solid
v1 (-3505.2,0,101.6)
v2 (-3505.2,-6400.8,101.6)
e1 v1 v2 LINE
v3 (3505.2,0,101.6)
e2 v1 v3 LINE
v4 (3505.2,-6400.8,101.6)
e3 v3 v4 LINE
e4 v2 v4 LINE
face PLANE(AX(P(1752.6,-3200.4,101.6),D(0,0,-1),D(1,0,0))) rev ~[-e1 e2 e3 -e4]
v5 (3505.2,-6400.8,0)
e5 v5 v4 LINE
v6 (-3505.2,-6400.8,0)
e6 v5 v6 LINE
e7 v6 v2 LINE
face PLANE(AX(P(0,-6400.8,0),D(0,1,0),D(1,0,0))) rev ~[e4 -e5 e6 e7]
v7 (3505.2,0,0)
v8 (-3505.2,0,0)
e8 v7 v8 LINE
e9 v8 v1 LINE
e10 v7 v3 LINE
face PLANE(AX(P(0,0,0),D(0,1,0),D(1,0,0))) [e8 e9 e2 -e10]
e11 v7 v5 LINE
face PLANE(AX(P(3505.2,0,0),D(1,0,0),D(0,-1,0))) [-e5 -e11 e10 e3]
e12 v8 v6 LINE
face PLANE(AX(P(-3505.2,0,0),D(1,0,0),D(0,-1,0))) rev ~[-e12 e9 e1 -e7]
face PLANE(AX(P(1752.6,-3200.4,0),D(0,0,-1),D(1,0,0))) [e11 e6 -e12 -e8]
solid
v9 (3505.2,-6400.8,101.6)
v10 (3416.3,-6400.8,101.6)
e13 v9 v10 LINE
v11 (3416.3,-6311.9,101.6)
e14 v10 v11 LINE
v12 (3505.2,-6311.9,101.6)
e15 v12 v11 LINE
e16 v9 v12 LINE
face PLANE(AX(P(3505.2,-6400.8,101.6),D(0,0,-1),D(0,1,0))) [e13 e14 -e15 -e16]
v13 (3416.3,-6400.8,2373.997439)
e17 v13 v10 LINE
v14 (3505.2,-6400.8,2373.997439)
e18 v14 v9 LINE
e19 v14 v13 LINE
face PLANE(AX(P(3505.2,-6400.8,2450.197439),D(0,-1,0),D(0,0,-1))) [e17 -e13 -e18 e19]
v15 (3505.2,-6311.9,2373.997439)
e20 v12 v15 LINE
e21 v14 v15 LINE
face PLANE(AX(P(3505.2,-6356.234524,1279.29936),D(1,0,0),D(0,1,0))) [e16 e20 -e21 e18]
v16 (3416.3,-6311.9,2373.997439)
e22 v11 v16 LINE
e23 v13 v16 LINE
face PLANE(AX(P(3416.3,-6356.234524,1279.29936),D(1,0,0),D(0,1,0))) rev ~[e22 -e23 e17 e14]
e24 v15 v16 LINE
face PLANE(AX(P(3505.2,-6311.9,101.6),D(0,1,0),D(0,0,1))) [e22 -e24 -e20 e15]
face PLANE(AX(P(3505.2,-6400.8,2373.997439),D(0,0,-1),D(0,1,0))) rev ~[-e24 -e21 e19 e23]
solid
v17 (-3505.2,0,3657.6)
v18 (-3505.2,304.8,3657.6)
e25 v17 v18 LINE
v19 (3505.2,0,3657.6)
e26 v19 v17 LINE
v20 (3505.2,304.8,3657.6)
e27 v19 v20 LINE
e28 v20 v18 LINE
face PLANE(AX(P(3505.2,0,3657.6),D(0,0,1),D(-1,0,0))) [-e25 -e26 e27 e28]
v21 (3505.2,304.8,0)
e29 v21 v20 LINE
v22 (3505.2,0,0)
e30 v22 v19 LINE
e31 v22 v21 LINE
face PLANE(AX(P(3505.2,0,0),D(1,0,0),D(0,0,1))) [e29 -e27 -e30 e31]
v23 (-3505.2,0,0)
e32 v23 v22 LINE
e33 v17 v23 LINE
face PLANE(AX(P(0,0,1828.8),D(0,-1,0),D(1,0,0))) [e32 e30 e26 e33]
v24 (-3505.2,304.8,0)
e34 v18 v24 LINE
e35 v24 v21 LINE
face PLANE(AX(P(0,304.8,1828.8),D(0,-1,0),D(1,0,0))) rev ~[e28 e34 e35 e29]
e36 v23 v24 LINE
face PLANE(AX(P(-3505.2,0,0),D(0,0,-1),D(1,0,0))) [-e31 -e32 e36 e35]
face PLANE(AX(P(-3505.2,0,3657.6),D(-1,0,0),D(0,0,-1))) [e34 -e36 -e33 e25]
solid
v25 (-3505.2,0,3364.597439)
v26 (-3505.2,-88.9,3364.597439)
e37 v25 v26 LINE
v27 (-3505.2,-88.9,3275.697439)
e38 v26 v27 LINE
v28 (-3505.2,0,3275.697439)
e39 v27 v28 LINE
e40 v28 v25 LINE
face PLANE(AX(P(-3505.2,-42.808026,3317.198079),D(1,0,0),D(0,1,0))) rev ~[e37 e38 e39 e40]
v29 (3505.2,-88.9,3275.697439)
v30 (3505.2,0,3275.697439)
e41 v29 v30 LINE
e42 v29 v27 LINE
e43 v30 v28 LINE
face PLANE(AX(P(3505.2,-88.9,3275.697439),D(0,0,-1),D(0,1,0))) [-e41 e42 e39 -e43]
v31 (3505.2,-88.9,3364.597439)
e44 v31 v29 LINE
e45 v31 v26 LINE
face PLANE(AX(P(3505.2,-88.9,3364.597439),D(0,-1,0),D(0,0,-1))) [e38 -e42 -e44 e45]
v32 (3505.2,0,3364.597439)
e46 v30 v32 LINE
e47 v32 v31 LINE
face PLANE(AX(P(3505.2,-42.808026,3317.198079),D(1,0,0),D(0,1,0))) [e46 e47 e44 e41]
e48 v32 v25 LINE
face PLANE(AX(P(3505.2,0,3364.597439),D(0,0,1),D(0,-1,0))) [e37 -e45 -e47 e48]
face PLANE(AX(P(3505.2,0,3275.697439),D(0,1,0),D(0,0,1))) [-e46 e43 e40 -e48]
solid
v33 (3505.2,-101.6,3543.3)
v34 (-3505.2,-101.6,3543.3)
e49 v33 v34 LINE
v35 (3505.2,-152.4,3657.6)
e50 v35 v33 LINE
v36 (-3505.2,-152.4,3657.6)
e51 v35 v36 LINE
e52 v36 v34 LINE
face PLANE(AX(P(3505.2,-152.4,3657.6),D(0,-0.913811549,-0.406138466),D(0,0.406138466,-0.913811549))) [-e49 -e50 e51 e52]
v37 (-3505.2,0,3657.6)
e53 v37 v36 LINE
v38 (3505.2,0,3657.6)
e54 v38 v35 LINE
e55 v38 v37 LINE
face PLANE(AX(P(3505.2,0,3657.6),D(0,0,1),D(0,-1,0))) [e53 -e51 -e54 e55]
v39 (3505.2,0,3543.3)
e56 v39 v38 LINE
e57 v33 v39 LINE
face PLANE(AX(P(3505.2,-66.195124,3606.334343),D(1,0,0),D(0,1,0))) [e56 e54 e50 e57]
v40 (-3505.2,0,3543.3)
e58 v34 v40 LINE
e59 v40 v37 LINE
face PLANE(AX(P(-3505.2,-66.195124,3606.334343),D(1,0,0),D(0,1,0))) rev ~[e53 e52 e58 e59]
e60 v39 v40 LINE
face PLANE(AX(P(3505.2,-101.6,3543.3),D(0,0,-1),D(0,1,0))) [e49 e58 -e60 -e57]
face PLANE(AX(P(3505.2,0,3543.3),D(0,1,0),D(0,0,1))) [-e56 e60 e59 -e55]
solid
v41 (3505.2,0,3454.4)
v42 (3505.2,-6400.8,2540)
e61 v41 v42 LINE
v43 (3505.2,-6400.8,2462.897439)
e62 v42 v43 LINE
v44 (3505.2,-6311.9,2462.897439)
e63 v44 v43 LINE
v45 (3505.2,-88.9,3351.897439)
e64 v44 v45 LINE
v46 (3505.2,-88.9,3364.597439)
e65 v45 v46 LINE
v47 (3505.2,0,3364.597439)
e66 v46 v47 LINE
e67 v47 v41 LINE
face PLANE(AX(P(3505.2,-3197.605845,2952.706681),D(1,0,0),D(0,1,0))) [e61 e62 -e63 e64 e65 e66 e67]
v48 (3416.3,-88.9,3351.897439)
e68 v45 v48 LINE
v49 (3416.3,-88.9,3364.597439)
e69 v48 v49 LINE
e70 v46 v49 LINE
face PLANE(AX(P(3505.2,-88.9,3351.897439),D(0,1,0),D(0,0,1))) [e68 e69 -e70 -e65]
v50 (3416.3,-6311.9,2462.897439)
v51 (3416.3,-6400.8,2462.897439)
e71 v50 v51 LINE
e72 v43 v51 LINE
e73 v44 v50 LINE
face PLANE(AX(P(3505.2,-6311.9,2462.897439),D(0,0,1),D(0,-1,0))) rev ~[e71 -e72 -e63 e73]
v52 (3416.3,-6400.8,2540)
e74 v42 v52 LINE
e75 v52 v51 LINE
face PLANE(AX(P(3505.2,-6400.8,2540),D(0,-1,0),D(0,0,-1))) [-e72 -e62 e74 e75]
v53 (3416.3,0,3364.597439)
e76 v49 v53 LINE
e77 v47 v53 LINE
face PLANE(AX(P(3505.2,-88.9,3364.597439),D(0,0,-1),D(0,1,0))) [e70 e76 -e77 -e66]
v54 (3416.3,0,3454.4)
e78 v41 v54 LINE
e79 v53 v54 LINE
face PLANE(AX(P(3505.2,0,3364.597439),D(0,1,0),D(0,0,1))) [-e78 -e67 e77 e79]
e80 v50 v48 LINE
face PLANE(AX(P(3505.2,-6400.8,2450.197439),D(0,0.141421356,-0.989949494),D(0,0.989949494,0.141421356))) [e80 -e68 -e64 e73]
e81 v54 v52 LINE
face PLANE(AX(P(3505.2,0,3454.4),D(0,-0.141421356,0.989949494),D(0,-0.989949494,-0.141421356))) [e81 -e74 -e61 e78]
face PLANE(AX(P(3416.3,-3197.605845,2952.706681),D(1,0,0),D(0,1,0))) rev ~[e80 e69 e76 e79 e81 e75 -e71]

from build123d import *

# Parameters (mm, degrees)
F2_DEPTH  = 304.8
F4_DEPTH  = 7010.4
F1_E1_W   = 3505.2
F1_E1_H   = 6400.8
F1_E0_W   = 3505.2
F1_E0_H   = 6400.8
F5_DEPTH  = 101.6
F7_DEPTH  = 88.9
F8_DEPTH  = 88.9
F9_DEPTH  = 7010.4
F11_DEPTH = 88.9


with BuildPart() as f2:
    # F0 (on Front) → F2 (new body)
    with BuildSketch(Plane.XZ):
        Polygon((-3505.2, 0), (0, 0), (3505.2, 0), (3505.2, 3657.6), (-3505.2, 3657.6), align=None)
    extrude(amount=-F2_DEPTH)


with BuildPart() as f4:
    # F3 (on face) → F4 (new body)
    with BuildSketch(Plane.YZ.offset(3505.2)):
        Polygon((0, 3543.3), (0, 3657.6), (-152.4, 3657.6), (-101.6, 3543.3), align=None)
    extrude(amount=-F4_DEPTH)


with BuildPart() as f5:
    # F1_E1 (on explicit) + F1_E0 (on explicit) → F5 (new body)
    with BuildSketch(Plane(origin=(0, 0, 0), x_dir=(-1, 0, 0), z_dir=(0, 0, 1))):
        with Locations((1752.6, 3200.4)):
            Rectangle(F1_E1_W, F1_E1_H)
    with BuildSketch(Plane(origin=(0, 0, 0), x_dir=(1, 0, 0), z_dir=(0, 0, -1))):
        with Locations((1752.6, 3200.4)):
            Rectangle(F1_E0_W, F1_E0_H)
    extrude(amount=F5_DEPTH, dir=(0, 0, 1))


with BuildPart() as f7:
    # F6 (on face) → F7 (new body)
    with BuildSketch(Plane.YZ.offset(3505.2)):
        Polygon((-6400.8, 101.6), (-6311.9, 101.6), (-6311.9, 2462.8974387893), (-6400.8, 2450.1974387893), align=None)
    extrude(amount=-F7_DEPTH)


with BuildPart() as f8:
    # F6 (on face) → F8 (new body)
    with BuildSketch(Plane.YZ.offset(3505.2)):
        Polygon((-88.9, 3364.5974387893), (0, 3364.5974387893), (0, 3454.4), (-6400.8, 2540), (-6400.8, 2450.1974387893), (-6311.9, 2462.8974387893), (-88.9, 3351.8974387893), align=None)
    extrude(amount=-F8_DEPTH)


with BuildPart() as f9:
    # F6 (on face) → F9 (new body)
    with BuildSketch(Plane.YZ.offset(3505.2)):
        Polygon((-88.9, 3275.6974387893), (0, 3275.6974387893), (0, 3364.5974387893), (-88.9, 3351.8974387893), align=None)
        Polygon((-88.9, 3351.8974387893), (0, 3364.5974387893), (-88.9, 3364.5974387893), align=None)
    extrude(amount=-F9_DEPTH)


with BuildPart() as f11_tool:
    # F10 (on face) → F11 (new body)
    with BuildSketch(Plane.YZ.offset(3505.2)):
        Polygon((-6311.9, 2373.9974387893), (-6311.9, 2462.8974387893), (-6400.8, 2450.1974387893), (-6400.8, 2373.9974387893), align=None)
        Polygon((-6400.8, 2450.1974387893), (-6311.9, 2462.8974387893), (-6400.8, 2462.8974387893), align=None)
    extrude(amount=-F11_DEPTH)


with BuildPart() as f7_1:
    add(f7.part)

    # F11: cut by f11_tool
    add(f11_tool.part, mode=Mode.SUBTRACT)


with BuildPart() as f8_1:
    add(f8.part)

    # F11: cut by f11_tool
    add(f11_tool.part, mode=Mode.SUBTRACT)


solid = Compound([f2.part, f4.part, f5.part, f9.part, f7_1.part, f8_1.part])
